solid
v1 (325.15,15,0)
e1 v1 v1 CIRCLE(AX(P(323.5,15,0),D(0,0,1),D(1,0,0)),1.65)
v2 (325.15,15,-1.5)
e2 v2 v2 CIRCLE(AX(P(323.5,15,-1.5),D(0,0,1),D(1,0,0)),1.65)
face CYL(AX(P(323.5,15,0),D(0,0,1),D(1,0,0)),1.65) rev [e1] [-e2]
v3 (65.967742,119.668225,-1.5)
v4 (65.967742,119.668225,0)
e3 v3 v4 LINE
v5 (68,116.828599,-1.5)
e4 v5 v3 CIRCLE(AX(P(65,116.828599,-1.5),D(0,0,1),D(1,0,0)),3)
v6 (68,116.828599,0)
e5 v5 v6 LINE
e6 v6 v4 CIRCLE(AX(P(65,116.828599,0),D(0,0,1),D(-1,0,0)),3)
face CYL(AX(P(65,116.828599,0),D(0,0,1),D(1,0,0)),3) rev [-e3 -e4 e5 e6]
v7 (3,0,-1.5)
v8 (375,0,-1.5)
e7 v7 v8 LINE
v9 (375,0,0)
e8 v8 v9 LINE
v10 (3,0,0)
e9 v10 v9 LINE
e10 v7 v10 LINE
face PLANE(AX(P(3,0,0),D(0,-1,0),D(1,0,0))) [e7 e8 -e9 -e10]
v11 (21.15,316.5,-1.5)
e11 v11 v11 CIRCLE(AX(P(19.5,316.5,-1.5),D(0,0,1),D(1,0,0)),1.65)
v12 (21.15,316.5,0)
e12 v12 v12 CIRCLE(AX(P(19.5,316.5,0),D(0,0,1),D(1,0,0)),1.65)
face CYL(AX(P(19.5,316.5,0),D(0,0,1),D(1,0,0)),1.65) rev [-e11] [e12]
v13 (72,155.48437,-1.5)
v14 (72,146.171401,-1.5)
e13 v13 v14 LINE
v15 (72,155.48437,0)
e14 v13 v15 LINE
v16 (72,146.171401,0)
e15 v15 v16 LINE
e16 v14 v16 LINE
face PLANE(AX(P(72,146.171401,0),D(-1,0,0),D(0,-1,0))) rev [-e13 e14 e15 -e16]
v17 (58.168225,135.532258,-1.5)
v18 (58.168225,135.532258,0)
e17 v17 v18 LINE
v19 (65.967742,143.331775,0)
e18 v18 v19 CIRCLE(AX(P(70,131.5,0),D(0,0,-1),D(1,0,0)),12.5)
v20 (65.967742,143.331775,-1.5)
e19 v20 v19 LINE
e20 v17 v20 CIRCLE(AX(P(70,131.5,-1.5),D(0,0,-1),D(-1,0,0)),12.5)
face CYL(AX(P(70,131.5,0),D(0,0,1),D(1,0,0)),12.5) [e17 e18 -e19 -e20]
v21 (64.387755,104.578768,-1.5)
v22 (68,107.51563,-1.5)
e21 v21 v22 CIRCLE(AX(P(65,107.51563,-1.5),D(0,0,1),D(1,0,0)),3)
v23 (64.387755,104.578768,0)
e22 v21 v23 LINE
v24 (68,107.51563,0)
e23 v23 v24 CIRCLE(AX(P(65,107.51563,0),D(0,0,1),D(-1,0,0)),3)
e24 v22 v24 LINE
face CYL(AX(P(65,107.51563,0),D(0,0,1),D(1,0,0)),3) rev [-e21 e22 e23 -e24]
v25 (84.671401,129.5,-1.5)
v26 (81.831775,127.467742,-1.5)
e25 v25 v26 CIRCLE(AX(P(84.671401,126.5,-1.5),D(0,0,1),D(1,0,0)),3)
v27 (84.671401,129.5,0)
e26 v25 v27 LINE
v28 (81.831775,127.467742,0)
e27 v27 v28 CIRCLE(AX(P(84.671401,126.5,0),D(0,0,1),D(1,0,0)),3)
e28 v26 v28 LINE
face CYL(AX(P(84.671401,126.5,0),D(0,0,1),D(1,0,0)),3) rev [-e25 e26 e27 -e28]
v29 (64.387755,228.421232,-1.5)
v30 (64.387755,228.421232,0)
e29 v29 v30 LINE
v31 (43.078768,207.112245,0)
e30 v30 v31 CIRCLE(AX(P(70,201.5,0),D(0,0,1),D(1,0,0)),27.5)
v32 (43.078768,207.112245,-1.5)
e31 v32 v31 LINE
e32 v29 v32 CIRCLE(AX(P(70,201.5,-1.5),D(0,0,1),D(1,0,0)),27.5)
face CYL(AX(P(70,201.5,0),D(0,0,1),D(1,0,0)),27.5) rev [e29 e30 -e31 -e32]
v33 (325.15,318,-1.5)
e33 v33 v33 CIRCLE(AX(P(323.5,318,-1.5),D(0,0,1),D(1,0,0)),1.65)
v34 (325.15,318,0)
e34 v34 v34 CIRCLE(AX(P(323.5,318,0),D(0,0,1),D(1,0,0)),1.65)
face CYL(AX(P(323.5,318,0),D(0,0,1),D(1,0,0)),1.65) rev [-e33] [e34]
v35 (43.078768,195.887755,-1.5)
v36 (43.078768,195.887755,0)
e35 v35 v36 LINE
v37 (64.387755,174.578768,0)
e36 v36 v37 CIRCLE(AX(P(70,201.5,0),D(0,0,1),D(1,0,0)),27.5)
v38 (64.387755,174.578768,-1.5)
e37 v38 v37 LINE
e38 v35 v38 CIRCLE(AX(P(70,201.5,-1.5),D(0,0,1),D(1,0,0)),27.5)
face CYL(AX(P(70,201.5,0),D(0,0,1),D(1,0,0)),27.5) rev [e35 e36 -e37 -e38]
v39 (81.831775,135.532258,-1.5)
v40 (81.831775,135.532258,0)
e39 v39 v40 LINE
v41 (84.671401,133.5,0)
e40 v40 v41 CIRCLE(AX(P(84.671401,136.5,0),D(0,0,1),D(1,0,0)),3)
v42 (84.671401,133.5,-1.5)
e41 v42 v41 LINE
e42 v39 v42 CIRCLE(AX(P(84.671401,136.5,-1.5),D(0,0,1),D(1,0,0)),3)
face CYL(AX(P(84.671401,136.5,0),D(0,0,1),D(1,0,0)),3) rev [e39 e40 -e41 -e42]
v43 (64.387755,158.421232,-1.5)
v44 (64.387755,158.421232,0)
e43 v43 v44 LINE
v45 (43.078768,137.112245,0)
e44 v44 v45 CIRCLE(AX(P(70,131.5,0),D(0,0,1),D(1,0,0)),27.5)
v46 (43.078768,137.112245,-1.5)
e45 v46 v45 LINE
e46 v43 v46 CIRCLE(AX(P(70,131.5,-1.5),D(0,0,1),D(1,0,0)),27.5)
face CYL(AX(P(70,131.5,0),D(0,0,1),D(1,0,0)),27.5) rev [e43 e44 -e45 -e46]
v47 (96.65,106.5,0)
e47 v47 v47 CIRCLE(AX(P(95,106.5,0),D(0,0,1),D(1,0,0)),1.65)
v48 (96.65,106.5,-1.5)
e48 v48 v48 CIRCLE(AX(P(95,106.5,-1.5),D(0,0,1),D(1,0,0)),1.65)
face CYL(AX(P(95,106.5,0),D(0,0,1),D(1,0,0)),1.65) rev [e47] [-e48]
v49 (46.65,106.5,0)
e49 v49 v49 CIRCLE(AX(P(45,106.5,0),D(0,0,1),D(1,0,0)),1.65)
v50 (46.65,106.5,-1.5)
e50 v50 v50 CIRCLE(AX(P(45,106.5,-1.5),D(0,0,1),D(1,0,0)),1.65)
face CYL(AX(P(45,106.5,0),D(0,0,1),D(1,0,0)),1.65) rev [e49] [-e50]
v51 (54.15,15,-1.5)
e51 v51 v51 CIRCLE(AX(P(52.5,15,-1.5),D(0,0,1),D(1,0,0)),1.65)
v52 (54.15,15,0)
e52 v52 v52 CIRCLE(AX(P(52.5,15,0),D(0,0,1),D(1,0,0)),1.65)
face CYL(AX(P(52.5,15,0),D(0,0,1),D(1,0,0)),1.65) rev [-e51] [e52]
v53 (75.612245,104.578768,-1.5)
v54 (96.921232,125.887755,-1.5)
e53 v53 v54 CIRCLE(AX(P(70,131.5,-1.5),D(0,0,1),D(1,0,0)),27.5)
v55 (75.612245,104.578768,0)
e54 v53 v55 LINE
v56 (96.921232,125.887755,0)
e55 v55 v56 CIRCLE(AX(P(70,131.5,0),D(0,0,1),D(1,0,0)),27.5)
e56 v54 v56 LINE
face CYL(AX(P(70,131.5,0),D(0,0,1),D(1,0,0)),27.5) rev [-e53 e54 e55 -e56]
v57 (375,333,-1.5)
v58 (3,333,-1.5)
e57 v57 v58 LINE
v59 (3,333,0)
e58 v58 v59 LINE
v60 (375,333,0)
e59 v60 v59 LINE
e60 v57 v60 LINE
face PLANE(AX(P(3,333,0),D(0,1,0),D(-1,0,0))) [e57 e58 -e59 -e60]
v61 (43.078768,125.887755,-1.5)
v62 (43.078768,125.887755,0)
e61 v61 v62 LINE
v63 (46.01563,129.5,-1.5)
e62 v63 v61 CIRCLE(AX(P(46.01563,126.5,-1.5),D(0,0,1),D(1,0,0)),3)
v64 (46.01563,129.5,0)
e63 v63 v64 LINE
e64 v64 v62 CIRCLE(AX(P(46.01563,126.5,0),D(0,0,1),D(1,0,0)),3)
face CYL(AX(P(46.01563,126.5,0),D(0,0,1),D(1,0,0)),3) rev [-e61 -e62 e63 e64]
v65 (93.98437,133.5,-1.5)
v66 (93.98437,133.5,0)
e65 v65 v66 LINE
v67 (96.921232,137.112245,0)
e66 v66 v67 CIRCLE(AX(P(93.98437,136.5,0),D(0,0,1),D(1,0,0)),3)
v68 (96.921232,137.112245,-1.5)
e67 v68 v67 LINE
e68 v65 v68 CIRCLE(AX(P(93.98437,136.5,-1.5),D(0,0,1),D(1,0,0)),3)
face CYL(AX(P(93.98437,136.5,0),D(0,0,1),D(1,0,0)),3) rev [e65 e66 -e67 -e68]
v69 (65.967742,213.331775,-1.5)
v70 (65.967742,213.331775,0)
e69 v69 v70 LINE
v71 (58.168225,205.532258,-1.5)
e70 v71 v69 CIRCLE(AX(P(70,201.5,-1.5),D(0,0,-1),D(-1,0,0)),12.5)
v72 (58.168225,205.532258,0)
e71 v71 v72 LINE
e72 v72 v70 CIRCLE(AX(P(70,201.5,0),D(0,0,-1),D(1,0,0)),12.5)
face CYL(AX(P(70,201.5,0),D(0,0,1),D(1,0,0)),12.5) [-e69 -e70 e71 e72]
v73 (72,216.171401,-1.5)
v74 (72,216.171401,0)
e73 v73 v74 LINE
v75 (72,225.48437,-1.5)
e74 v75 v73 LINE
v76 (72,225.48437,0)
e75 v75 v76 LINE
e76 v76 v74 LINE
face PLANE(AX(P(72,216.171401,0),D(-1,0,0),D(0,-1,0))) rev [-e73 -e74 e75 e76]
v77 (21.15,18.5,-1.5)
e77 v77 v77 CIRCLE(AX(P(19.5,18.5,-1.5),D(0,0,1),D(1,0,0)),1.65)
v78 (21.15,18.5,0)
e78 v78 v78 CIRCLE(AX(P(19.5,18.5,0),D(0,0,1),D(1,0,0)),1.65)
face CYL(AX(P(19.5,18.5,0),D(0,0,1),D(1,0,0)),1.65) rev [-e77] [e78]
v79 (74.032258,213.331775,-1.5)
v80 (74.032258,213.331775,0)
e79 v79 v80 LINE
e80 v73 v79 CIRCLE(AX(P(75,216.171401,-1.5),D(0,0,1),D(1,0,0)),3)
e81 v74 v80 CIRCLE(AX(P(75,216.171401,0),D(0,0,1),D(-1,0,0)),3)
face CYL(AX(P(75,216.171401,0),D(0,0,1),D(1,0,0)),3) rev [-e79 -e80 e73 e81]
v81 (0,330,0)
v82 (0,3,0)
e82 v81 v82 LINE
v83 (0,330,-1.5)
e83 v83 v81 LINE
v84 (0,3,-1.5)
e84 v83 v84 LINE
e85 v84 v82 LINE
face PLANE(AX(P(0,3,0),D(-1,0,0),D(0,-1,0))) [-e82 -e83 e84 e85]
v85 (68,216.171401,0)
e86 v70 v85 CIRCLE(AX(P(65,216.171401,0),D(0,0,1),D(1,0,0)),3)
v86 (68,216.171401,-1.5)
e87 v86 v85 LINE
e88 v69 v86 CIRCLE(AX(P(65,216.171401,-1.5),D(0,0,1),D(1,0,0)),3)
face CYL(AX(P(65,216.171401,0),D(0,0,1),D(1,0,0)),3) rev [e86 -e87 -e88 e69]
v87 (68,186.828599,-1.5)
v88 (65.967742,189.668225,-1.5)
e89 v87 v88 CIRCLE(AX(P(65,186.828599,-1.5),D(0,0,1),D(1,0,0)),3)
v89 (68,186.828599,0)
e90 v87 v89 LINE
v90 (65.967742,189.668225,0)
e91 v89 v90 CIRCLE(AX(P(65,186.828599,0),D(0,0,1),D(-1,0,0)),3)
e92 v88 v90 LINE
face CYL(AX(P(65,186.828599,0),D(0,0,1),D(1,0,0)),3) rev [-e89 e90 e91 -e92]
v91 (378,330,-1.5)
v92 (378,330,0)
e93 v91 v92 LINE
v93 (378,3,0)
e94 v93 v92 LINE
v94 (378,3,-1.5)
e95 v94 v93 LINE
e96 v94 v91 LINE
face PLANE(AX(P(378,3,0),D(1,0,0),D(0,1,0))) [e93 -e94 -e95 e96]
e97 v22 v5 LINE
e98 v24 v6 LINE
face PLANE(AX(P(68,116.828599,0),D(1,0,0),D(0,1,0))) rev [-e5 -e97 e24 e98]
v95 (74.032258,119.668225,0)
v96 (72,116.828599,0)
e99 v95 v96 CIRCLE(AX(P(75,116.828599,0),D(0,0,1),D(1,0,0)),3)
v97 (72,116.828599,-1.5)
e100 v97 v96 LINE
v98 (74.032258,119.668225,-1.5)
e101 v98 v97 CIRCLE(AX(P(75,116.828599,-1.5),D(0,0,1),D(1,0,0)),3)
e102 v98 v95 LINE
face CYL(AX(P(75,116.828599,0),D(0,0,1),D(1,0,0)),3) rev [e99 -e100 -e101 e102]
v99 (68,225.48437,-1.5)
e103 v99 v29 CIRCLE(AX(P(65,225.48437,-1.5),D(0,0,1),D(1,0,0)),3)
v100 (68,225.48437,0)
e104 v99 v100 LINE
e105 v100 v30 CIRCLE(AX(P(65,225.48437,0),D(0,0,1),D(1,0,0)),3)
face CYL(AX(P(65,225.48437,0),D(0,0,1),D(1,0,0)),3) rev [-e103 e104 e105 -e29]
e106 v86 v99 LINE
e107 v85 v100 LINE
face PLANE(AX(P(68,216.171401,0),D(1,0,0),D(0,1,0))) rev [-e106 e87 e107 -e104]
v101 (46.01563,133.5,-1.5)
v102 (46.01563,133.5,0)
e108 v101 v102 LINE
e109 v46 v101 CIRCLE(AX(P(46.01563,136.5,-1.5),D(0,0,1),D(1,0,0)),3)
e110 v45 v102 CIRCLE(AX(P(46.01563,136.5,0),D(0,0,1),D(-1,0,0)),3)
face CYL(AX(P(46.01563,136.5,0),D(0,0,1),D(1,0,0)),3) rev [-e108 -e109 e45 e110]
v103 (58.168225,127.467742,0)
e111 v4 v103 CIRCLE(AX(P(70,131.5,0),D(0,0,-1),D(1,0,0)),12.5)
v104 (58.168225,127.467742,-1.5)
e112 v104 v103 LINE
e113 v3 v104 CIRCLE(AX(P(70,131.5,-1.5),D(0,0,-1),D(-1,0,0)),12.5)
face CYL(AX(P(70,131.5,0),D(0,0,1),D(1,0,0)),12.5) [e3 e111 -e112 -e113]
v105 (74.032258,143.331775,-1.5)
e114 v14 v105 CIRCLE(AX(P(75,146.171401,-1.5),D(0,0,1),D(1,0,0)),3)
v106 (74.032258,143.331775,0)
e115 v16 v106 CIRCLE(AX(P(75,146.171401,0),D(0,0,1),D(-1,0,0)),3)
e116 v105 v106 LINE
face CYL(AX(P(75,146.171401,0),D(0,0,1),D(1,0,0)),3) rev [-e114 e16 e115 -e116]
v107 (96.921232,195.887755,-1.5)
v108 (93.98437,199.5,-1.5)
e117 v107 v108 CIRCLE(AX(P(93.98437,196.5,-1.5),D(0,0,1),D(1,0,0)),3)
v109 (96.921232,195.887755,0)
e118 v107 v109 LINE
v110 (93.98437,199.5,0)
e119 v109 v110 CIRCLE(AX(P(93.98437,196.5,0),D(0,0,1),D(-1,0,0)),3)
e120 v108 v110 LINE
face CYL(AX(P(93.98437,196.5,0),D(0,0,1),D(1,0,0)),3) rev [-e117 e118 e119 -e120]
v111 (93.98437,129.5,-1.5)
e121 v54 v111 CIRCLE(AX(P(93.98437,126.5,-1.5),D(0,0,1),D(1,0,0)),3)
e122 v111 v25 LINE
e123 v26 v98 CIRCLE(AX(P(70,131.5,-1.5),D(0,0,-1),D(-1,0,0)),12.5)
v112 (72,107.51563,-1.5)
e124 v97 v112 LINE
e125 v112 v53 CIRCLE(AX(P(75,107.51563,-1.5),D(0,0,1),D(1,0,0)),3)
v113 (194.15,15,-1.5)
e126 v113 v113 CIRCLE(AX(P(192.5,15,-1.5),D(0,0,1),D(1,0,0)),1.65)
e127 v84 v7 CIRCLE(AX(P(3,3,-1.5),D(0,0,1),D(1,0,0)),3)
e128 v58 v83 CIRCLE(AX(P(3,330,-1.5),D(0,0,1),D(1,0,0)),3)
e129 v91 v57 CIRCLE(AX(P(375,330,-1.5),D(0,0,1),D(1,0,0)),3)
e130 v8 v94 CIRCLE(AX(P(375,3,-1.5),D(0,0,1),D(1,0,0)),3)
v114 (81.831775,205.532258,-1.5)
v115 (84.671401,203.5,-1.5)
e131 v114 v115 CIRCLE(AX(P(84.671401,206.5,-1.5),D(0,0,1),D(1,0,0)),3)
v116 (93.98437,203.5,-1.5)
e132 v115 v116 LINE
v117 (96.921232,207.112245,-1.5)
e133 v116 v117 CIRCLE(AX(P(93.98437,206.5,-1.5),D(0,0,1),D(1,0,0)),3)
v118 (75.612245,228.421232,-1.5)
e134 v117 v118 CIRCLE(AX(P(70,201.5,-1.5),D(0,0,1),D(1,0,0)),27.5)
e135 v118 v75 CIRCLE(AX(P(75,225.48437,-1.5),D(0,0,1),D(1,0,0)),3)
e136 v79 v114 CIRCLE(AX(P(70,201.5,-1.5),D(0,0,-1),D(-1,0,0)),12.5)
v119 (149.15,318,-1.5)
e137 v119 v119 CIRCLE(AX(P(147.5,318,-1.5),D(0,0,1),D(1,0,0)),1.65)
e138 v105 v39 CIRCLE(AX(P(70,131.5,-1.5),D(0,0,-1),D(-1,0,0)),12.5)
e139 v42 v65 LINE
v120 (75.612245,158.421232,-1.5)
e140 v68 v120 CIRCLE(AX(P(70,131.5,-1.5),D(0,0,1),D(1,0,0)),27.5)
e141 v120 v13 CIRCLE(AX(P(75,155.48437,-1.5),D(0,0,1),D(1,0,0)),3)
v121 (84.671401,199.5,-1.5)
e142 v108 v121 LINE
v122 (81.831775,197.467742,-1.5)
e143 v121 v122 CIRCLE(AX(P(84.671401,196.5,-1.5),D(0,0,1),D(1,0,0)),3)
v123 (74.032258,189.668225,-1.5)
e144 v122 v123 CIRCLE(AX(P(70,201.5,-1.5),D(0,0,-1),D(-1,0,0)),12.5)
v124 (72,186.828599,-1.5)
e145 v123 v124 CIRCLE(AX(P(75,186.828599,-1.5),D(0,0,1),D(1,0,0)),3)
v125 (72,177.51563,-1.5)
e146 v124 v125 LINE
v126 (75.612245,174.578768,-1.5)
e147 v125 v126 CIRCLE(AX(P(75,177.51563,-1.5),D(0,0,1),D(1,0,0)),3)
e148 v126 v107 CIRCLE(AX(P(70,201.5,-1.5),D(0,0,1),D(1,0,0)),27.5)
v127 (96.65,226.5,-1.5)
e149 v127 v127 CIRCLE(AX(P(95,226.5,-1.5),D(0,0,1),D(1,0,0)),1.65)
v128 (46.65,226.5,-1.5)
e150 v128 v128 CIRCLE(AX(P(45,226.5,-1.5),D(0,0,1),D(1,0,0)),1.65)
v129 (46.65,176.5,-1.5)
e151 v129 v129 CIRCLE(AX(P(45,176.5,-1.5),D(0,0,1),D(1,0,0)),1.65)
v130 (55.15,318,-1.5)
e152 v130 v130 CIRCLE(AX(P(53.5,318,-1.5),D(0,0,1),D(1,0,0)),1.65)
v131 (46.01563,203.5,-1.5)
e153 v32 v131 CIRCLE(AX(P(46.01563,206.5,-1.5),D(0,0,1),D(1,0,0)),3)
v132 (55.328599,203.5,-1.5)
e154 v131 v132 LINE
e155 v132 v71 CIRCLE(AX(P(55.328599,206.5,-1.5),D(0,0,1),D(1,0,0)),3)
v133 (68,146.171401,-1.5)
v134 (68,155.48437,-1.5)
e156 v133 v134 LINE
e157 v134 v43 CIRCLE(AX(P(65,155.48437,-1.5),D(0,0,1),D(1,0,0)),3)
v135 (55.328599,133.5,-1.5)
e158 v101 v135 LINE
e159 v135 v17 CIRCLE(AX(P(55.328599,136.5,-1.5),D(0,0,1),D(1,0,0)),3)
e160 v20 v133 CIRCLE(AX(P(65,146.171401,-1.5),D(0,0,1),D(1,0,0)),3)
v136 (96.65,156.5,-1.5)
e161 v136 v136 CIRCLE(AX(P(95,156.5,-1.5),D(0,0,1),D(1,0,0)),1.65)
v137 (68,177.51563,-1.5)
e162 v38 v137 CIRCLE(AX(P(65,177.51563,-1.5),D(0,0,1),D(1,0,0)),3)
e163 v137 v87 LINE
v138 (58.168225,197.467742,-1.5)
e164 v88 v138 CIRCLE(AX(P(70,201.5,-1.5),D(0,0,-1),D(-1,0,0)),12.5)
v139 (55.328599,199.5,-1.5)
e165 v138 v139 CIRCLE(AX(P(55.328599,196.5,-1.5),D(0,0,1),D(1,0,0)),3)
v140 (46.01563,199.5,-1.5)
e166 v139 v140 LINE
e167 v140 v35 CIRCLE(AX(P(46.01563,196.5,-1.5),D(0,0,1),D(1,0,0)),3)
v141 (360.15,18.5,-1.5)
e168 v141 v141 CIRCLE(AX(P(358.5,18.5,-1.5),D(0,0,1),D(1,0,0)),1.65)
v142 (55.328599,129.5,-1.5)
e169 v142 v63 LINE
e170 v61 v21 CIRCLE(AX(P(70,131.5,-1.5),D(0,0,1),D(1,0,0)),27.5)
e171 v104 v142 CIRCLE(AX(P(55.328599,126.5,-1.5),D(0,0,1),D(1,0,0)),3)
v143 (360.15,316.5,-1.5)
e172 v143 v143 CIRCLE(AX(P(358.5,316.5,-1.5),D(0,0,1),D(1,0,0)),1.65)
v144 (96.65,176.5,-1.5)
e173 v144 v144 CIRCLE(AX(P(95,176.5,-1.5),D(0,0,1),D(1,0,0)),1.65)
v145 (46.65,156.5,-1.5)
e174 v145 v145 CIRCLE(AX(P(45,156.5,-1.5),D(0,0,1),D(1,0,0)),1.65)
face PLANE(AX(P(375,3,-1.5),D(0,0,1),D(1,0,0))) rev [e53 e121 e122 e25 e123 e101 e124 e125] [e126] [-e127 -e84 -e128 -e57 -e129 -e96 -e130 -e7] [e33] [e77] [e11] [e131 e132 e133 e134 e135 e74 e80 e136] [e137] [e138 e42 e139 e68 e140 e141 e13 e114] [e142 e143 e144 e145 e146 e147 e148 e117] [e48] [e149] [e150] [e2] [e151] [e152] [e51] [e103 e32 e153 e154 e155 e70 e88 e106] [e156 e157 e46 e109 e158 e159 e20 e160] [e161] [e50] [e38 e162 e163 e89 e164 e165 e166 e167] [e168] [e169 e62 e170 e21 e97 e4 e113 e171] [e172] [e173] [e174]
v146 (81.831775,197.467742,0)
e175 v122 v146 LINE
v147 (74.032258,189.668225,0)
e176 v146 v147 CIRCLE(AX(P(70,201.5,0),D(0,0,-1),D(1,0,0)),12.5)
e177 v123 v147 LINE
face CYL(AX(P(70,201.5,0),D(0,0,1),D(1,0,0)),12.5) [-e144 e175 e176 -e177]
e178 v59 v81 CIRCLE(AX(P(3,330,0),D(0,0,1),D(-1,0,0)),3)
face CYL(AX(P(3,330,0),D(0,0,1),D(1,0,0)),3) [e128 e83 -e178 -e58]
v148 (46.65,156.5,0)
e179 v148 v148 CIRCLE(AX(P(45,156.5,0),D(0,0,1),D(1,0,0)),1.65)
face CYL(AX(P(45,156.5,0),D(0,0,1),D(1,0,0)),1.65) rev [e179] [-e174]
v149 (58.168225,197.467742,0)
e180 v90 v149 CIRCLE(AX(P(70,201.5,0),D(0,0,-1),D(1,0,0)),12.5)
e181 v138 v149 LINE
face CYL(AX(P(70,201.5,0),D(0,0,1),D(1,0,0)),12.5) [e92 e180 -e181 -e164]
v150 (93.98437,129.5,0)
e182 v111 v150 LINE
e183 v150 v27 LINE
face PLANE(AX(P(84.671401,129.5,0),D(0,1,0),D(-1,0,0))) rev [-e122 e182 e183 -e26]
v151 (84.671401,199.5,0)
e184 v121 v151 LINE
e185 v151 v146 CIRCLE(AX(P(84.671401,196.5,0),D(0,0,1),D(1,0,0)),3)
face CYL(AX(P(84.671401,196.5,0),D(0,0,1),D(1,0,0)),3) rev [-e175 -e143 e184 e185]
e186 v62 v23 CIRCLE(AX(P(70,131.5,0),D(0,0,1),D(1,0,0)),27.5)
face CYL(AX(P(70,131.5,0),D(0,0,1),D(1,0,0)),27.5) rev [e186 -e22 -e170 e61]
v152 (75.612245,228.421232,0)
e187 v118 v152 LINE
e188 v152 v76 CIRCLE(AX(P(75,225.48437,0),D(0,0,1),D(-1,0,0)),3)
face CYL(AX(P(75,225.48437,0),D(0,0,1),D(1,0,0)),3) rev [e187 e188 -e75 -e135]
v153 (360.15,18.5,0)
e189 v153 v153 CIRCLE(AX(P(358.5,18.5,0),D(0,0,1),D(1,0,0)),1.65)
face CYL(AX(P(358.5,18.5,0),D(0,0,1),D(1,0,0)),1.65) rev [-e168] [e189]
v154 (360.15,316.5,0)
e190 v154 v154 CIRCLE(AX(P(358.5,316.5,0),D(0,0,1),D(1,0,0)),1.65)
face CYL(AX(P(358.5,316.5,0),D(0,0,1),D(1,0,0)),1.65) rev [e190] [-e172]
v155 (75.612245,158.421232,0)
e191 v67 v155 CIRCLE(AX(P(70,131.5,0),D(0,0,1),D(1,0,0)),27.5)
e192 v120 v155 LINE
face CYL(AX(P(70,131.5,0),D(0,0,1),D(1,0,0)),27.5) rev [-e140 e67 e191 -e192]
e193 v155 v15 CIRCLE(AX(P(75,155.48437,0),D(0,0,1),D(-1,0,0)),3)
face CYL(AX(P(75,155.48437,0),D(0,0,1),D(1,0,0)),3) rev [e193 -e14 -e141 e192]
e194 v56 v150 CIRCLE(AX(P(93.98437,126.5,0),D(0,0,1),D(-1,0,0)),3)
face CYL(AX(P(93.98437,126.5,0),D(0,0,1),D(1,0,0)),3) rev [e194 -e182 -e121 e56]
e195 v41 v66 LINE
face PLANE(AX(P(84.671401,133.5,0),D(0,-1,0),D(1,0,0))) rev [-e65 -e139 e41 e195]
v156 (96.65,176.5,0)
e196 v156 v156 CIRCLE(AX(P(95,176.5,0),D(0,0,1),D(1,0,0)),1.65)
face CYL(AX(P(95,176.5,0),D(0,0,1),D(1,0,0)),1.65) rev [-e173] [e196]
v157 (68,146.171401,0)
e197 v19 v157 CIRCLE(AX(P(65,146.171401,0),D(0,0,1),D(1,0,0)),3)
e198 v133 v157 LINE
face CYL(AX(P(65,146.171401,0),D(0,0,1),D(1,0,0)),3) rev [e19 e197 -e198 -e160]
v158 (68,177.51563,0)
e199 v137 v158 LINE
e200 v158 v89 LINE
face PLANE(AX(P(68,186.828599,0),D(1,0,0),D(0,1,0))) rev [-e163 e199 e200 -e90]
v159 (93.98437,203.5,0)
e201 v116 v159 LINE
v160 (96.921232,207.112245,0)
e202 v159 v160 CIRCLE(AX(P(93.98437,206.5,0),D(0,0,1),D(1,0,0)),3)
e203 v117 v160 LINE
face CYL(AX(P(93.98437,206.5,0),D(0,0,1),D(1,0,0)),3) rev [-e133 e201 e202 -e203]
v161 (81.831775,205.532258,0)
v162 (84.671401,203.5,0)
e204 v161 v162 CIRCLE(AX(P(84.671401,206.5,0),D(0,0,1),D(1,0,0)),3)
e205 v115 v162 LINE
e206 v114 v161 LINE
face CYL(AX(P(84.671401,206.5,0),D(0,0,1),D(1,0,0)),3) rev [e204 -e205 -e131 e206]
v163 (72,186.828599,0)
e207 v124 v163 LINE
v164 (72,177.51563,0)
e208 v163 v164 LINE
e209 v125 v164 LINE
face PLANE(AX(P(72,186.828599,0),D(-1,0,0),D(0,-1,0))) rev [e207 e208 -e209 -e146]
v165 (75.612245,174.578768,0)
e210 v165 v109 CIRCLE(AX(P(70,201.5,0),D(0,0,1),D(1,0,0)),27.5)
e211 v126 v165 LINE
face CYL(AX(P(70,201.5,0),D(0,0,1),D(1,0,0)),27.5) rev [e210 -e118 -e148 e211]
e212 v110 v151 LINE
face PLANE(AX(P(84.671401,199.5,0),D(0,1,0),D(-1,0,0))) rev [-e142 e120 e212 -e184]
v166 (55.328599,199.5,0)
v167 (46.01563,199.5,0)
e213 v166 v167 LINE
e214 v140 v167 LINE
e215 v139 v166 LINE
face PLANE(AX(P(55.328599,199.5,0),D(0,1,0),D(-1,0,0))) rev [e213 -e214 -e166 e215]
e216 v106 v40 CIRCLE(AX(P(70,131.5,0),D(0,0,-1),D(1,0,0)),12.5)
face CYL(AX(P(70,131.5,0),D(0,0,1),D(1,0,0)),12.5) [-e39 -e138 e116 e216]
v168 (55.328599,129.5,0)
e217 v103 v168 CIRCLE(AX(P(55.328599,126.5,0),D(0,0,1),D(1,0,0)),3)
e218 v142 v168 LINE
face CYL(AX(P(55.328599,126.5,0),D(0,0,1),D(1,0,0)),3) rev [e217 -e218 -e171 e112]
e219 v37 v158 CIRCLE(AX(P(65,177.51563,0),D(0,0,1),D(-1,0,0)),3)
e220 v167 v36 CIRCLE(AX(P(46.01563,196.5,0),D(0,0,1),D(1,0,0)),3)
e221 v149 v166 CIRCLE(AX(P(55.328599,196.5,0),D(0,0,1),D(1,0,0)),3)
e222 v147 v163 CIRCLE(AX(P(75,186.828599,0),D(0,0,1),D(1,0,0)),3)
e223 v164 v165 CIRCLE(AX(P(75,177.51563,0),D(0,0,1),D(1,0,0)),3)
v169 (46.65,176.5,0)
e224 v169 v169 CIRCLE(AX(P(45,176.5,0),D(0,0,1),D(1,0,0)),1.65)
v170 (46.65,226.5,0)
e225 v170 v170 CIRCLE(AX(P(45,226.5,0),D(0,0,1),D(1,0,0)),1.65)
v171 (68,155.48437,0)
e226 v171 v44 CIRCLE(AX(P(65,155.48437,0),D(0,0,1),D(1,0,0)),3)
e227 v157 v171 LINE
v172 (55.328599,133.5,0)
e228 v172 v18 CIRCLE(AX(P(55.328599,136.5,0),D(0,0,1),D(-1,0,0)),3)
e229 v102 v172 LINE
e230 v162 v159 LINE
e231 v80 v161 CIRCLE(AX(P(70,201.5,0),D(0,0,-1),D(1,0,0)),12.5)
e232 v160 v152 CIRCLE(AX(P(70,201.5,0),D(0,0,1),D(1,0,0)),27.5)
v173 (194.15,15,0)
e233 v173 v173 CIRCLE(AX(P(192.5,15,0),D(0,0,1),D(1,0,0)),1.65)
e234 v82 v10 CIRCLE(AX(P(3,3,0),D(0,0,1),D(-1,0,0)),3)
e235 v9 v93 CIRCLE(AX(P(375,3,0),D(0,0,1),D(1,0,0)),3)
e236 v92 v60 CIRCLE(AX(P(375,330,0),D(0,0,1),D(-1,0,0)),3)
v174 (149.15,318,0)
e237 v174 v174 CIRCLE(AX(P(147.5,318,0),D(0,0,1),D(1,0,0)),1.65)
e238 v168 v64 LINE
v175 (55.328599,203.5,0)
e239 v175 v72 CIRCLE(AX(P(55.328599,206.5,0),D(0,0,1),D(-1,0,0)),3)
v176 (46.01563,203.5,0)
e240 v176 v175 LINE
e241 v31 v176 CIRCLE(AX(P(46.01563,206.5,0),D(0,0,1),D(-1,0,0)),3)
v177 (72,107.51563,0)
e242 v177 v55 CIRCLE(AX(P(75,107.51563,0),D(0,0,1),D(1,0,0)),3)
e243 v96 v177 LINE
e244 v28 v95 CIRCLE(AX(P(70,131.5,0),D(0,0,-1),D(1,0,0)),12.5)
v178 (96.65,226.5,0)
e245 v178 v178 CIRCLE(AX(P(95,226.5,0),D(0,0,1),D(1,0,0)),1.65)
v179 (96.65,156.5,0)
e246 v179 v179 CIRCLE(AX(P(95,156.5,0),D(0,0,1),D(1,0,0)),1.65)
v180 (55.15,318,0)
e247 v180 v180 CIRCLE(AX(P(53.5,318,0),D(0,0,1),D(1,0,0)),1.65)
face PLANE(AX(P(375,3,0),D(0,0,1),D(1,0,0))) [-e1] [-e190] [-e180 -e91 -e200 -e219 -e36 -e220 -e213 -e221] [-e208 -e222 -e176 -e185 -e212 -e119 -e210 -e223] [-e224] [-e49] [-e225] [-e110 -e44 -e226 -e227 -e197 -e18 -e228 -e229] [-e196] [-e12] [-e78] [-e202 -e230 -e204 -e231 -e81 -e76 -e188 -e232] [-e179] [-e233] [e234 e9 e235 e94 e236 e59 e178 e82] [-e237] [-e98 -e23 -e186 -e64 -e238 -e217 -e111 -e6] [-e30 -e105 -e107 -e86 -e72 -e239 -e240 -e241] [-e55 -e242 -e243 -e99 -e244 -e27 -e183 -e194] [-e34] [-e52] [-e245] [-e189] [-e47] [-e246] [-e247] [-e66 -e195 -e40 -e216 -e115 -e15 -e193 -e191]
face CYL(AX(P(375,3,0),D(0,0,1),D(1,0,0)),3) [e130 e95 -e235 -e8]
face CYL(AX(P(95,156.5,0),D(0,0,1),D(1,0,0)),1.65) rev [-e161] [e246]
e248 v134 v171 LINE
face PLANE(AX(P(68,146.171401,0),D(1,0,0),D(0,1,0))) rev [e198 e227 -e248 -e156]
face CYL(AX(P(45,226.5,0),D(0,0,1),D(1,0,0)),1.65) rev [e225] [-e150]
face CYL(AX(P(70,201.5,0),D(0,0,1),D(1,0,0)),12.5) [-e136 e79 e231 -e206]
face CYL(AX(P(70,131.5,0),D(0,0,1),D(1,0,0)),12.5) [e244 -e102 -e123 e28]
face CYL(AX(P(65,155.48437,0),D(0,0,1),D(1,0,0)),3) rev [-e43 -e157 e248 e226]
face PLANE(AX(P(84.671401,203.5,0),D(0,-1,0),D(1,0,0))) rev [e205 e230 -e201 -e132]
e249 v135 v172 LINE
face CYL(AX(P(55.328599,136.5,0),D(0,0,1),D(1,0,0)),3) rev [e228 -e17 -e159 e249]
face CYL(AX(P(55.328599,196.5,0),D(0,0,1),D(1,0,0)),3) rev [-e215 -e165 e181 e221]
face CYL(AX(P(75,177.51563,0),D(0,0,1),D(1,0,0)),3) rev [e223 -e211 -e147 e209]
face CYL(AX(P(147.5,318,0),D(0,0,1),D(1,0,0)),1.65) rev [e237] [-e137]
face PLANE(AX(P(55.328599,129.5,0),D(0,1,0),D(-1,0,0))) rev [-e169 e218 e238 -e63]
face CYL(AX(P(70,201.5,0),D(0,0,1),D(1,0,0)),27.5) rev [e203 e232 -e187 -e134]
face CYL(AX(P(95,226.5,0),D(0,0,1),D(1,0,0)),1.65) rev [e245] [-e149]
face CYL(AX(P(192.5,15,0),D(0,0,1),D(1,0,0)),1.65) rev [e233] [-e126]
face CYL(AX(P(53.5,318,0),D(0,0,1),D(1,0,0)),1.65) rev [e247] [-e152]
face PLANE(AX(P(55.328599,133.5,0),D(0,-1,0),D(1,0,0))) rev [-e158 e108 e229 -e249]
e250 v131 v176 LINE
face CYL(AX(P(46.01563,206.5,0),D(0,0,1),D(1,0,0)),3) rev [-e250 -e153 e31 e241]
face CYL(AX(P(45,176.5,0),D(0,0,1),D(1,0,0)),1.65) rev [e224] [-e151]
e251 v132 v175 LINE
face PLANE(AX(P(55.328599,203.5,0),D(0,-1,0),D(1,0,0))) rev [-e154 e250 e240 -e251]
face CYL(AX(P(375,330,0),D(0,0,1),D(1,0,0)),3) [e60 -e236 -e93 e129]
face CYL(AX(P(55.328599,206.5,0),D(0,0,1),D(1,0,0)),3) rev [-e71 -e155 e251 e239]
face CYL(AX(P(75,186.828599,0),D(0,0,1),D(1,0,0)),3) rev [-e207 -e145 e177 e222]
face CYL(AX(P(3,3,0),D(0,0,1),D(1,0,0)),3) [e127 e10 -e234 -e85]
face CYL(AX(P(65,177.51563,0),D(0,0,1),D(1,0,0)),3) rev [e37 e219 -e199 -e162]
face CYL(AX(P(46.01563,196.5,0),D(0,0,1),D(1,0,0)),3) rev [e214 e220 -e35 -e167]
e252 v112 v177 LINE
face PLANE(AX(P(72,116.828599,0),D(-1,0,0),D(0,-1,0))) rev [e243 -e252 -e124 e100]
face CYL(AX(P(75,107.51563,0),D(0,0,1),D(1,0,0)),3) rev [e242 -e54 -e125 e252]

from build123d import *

# Parameters (mm, degrees)
CONVERT_SOLID1_START     = -1.5
CONVERT_SOLID1_OUTLINE_R = 1.65
CONVERT_SOLID1_DEPTH     = 1.5


# Read off the part's stored shape, not the designer's step: Convert-Solid1
with BuildPart() as part:
    # Convert-Solid1 outline → Convert-Solid1 (new body)
    with BuildSketch(Plane.XY.offset(CONVERT_SOLID1_START)):
        with BuildLine():
            Line((378, 3), (378, 330))
            ThreePointArc((378, 330), (377.121320344, 332.121320344), (375, 333))
            Line((375, 333), (3, 333))
            ThreePointArc((3, 333), (0.878679656, 332.121320344), (0, 330))
            Line((0, 330), (0, 3))
            ThreePointArc((0, 3), (0.878679656, 0.878679656), (3, 0))
            Line((3, 0), (375, 0))
            ThreePointArc((375, 0), (377.121320344, 0.878679656), (378, 3))
        make_face()
        with Locations((19.5, 18.5)):
            Circle(CONVERT_SOLID1_OUTLINE_R, mode=Mode.SUBTRACT)
        with Locations((52.5, 15)):
            Circle(CONVERT_SOLID1_OUTLINE_R, mode=Mode.SUBTRACT)
        with Locations((45, 106.5)):
            Circle(CONVERT_SOLID1_OUTLINE_R, mode=Mode.SUBTRACT)
        with BuildLine():
            ThreePointArc((65.967741935, 119.668225201), (67.439592774, 118.574562335), (68, 116.828599249))
            Line((68, 116.828599249), (68, 107.51563009))
            ThreePointArc((68, 107.51563009), (66.892520186, 105.187891413), (64.387755102, 104.578768468))
            ThreePointArc((64.387755102, 104.578768468), (50.554563517, 112.054563517), (43.078768468, 125.887755102))
            ThreePointArc((43.078768468, 125.887755102), (43.687891413, 128.392520186), (46.01563009, 129.5))
            Line((46.01563009, 129.5), (55.328599249, 129.5))
            ThreePointArc((55.328599249, 129.5), (57.074562335, 128.939592774), (58.168225201, 127.467741935))
            ThreePointArc((58.168225201, 127.467741935), (61.161165235, 122.661165235), (65.967741935, 119.668225201))
        make_face(mode=Mode.SUBTRACT)
        with BuildLine():
            ThreePointArc((81.831774799, 127.467741935), (82.925437665, 128.939592774), (84.671400751, 129.5))
            Line((84.671400751, 129.5), (93.98436991, 129.5))
            ThreePointArc((93.98436991, 129.5), (96.312108587, 128.392520186), (96.921231532, 125.887755102))
            ThreePointArc((96.921231532, 125.887755102), (89.445436483, 112.054563517), (75.612244898, 104.578768468))
            ThreePointArc((75.612244898, 104.578768468), (73.107479814, 105.187891413), (72, 107.51563009))
            Line((72, 107.51563009), (72, 116.828599249))
            ThreePointArc((72, 116.828599249), (72.560407226, 118.574562335), (74.032258065, 119.668225201))
            ThreePointArc((74.032258065, 119.668225201), (78.838834765, 122.661165235), (81.831774799, 127.467741935))
        make_face(mode=Mode.SUBTRACT)
        with Locations((45, 156.5)):
            Circle(CONVERT_SOLID1_OUTLINE_R, mode=Mode.SUBTRACT)
        with BuildLine():
            ThreePointArc((68, 146.171400751), (67.439592774, 144.425437665), (65.967741935, 143.331774799))
            ThreePointArc((65.967741935, 143.331774799), (61.161165235, 140.338834765), (58.168225201, 135.532258065))
            ThreePointArc((58.168225201, 135.532258065), (57.074562335, 134.060407226), (55.328599249, 133.5))
            Line((55.328599249, 133.5), (46.01563009, 133.5))
            ThreePointArc((46.01563009, 133.5), (43.687891413, 134.607479814), (43.078768468, 137.112244898))
            ThreePointArc((43.078768468, 137.112244898), (50.554563517, 150.945436483), (64.387755102, 158.421231532))
            ThreePointArc((64.387755102, 158.421231532), (66.892520186, 157.812108587), (68, 155.48436991))
            Line((68, 155.48436991), (68, 146.171400751))
        make_face(mode=Mode.SUBTRACT)
        with BuildLine():
            ThreePointArc((84.671400751, 133.5), (82.925437665, 134.060407226), (81.831774799, 135.532258065))
            ThreePointArc((81.831774799, 135.532258065), (78.838834765, 140.338834765), (74.032258065, 143.331774799))
            ThreePointArc((74.032258065, 143.331774799), (72.560407226, 144.425437665), (72, 146.171400751))
            Line((72, 146.171400751), (72, 155.48436991))
            ThreePointArc((72, 155.48436991), (73.107479814, 157.812108587), (75.612244898, 158.421231532))
            ThreePointArc((75.612244898, 158.421231532), (89.445436483, 150.945436483), (96.921231532, 137.112244898))
            ThreePointArc((96.921231532, 137.112244898), (96.312108587, 134.607479814), (93.98436991, 133.5))
            Line((93.98436991, 133.5), (84.671400751, 133.5))
        make_face(mode=Mode.SUBTRACT)
        with Locations((95, 106.5)):
            Circle(CONVERT_SOLID1_OUTLINE_R, mode=Mode.SUBTRACT)
        with Locations((95, 156.5)):
            Circle(CONVERT_SOLID1_OUTLINE_R, mode=Mode.SUBTRACT)
        with Locations((192.5, 15)):
            Circle(CONVERT_SOLID1_OUTLINE_R, mode=Mode.SUBTRACT)
        with Locations((323.5, 15)):
            Circle(CONVERT_SOLID1_OUTLINE_R, mode=Mode.SUBTRACT)
        with Locations((358.5, 18.5)):
            Circle(CONVERT_SOLID1_OUTLINE_R, mode=Mode.SUBTRACT)
        with Locations((45, 176.5)):
            Circle(CONVERT_SOLID1_OUTLINE_R, mode=Mode.SUBTRACT)
        with BuildLine():
            ThreePointArc((65.967741935, 189.668225201), (67.439592774, 188.574562335), (68, 186.828599249))
            Line((68, 186.828599249), (68, 177.51563009))
            ThreePointArc((68, 177.51563009), (66.892520186, 175.187891413), (64.387755102, 174.578768468))
            ThreePointArc((64.387755102, 174.578768468), (50.554563517, 182.054563517), (43.078768468, 195.887755102))
            ThreePointArc((43.078768468, 195.887755102), (43.687891413, 198.392520186), (46.01563009, 199.5))
            Line((46.01563009, 199.5), (55.328599249, 199.5))
            ThreePointArc((55.328599249, 199.5), (57.074562335, 198.939592774), (58.168225201, 197.467741935))
            ThreePointArc((58.168225201, 197.467741935), (61.161165235, 192.661165235), (65.967741935, 189.668225201))
        make_face(mode=Mode.SUBTRACT)
        with BuildLine():
            ThreePointArc((81.831774799, 197.467741935), (82.925437665, 198.939592774), (84.671400751, 199.5))
            Line((84.671400751, 199.5), (93.98436991, 199.5))
            ThreePointArc((93.98436991, 199.5), (96.312108587, 198.392520186), (96.921231532, 195.887755102))
            ThreePointArc((96.921231532, 195.887755102), (89.445436483, 182.054563517), (75.612244898, 174.578768468))
            ThreePointArc((75.612244898, 174.578768468), (73.107479814, 175.187891413), (72, 177.51563009))
            Line((72, 177.51563009), (72, 186.828599249))
            ThreePointArc((72, 186.828599249), (72.560407226, 188.574562335), (74.032258065, 189.668225201))
            ThreePointArc((74.032258065, 189.668225201), (78.838834765, 192.661165235), (81.831774799, 197.467741935))
        make_face(mode=Mode.SUBTRACT)
        with Locations((45, 226.5)):
            Circle(CONVERT_SOLID1_OUTLINE_R, mode=Mode.SUBTRACT)
        with BuildLine():
            ThreePointArc((68, 216.171400751), (67.439592774, 214.425437665), (65.967741935, 213.331774799))
            ThreePointArc((65.967741935, 213.331774799), (61.161165235, 210.338834765), (58.168225201, 205.532258065))
            ThreePointArc((58.168225201, 205.532258065), (57.074562335, 204.060407226), (55.328599249, 203.5))
            Line((55.328599249, 203.5), (46.01563009, 203.5))
            ThreePointArc((46.01563009, 203.5), (43.687891413, 204.607479814), (43.078768468, 207.112244898))
            ThreePointArc((43.078768468, 207.112244898), (50.554563517, 220.945436483), (64.387755102, 228.421231532))
            ThreePointArc((64.387755102, 228.421231532), (66.892520186, 227.812108587), (68, 225.48436991))
            Line((68, 225.48436991), (68, 216.171400751))
        make_face(mode=Mode.SUBTRACT)
        with BuildLine():
            ThreePointArc((84.671400751, 203.5), (82.925437665, 204.060407226), (81.831774799, 205.532258065))
            ThreePointArc((81.831774799, 205.532258065), (78.838834765, 210.338834765), (74.032258065, 213.331774799))
            ThreePointArc((74.032258065, 213.331774799), (72.560407226, 214.425437665), (72, 216.171400751))
            Line((72, 216.171400751), (72, 225.48436991))
            ThreePointArc((72, 225.48436991), (73.107479814, 227.812108587), (75.612244898, 228.421231532))
            ThreePointArc((75.612244898, 228.421231532), (89.445436483, 220.945436483), (96.921231532, 207.112244898))
            ThreePointArc((96.921231532, 207.112244898), (96.312108587, 204.607479814), (93.98436991, 203.5))
            Line((93.98436991, 203.5), (84.671400751, 203.5))
        make_face(mode=Mode.SUBTRACT)
        with Locations((95, 176.5)):
            Circle(CONVERT_SOLID1_OUTLINE_R, mode=Mode.SUBTRACT)
        with Locations((95, 226.5)):
            Circle(CONVERT_SOLID1_OUTLINE_R, mode=Mode.SUBTRACT)
        with Locations((19.5, 316.5)):
            Circle(CONVERT_SOLID1_OUTLINE_R, mode=Mode.SUBTRACT)
        with Locations((53.5, 318)):
            Circle(CONVERT_SOLID1_OUTLINE_R, mode=Mode.SUBTRACT)
        with Locations((147.5, 318)):
            Circle(CONVERT_SOLID1_OUTLINE_R, mode=Mode.SUBTRACT)
        with Locations((323.5, 318)):
            Circle(CONVERT_SOLID1_OUTLINE_R, mode=Mode.SUBTRACT)
        with Locations((358.5, 316.5)):
            Circle(CONVERT_SOLID1_OUTLINE_R, mode=Mode.SUBTRACT)
    extrude(amount=CONVERT_SOLID1_DEPTH)


solid = part.part
